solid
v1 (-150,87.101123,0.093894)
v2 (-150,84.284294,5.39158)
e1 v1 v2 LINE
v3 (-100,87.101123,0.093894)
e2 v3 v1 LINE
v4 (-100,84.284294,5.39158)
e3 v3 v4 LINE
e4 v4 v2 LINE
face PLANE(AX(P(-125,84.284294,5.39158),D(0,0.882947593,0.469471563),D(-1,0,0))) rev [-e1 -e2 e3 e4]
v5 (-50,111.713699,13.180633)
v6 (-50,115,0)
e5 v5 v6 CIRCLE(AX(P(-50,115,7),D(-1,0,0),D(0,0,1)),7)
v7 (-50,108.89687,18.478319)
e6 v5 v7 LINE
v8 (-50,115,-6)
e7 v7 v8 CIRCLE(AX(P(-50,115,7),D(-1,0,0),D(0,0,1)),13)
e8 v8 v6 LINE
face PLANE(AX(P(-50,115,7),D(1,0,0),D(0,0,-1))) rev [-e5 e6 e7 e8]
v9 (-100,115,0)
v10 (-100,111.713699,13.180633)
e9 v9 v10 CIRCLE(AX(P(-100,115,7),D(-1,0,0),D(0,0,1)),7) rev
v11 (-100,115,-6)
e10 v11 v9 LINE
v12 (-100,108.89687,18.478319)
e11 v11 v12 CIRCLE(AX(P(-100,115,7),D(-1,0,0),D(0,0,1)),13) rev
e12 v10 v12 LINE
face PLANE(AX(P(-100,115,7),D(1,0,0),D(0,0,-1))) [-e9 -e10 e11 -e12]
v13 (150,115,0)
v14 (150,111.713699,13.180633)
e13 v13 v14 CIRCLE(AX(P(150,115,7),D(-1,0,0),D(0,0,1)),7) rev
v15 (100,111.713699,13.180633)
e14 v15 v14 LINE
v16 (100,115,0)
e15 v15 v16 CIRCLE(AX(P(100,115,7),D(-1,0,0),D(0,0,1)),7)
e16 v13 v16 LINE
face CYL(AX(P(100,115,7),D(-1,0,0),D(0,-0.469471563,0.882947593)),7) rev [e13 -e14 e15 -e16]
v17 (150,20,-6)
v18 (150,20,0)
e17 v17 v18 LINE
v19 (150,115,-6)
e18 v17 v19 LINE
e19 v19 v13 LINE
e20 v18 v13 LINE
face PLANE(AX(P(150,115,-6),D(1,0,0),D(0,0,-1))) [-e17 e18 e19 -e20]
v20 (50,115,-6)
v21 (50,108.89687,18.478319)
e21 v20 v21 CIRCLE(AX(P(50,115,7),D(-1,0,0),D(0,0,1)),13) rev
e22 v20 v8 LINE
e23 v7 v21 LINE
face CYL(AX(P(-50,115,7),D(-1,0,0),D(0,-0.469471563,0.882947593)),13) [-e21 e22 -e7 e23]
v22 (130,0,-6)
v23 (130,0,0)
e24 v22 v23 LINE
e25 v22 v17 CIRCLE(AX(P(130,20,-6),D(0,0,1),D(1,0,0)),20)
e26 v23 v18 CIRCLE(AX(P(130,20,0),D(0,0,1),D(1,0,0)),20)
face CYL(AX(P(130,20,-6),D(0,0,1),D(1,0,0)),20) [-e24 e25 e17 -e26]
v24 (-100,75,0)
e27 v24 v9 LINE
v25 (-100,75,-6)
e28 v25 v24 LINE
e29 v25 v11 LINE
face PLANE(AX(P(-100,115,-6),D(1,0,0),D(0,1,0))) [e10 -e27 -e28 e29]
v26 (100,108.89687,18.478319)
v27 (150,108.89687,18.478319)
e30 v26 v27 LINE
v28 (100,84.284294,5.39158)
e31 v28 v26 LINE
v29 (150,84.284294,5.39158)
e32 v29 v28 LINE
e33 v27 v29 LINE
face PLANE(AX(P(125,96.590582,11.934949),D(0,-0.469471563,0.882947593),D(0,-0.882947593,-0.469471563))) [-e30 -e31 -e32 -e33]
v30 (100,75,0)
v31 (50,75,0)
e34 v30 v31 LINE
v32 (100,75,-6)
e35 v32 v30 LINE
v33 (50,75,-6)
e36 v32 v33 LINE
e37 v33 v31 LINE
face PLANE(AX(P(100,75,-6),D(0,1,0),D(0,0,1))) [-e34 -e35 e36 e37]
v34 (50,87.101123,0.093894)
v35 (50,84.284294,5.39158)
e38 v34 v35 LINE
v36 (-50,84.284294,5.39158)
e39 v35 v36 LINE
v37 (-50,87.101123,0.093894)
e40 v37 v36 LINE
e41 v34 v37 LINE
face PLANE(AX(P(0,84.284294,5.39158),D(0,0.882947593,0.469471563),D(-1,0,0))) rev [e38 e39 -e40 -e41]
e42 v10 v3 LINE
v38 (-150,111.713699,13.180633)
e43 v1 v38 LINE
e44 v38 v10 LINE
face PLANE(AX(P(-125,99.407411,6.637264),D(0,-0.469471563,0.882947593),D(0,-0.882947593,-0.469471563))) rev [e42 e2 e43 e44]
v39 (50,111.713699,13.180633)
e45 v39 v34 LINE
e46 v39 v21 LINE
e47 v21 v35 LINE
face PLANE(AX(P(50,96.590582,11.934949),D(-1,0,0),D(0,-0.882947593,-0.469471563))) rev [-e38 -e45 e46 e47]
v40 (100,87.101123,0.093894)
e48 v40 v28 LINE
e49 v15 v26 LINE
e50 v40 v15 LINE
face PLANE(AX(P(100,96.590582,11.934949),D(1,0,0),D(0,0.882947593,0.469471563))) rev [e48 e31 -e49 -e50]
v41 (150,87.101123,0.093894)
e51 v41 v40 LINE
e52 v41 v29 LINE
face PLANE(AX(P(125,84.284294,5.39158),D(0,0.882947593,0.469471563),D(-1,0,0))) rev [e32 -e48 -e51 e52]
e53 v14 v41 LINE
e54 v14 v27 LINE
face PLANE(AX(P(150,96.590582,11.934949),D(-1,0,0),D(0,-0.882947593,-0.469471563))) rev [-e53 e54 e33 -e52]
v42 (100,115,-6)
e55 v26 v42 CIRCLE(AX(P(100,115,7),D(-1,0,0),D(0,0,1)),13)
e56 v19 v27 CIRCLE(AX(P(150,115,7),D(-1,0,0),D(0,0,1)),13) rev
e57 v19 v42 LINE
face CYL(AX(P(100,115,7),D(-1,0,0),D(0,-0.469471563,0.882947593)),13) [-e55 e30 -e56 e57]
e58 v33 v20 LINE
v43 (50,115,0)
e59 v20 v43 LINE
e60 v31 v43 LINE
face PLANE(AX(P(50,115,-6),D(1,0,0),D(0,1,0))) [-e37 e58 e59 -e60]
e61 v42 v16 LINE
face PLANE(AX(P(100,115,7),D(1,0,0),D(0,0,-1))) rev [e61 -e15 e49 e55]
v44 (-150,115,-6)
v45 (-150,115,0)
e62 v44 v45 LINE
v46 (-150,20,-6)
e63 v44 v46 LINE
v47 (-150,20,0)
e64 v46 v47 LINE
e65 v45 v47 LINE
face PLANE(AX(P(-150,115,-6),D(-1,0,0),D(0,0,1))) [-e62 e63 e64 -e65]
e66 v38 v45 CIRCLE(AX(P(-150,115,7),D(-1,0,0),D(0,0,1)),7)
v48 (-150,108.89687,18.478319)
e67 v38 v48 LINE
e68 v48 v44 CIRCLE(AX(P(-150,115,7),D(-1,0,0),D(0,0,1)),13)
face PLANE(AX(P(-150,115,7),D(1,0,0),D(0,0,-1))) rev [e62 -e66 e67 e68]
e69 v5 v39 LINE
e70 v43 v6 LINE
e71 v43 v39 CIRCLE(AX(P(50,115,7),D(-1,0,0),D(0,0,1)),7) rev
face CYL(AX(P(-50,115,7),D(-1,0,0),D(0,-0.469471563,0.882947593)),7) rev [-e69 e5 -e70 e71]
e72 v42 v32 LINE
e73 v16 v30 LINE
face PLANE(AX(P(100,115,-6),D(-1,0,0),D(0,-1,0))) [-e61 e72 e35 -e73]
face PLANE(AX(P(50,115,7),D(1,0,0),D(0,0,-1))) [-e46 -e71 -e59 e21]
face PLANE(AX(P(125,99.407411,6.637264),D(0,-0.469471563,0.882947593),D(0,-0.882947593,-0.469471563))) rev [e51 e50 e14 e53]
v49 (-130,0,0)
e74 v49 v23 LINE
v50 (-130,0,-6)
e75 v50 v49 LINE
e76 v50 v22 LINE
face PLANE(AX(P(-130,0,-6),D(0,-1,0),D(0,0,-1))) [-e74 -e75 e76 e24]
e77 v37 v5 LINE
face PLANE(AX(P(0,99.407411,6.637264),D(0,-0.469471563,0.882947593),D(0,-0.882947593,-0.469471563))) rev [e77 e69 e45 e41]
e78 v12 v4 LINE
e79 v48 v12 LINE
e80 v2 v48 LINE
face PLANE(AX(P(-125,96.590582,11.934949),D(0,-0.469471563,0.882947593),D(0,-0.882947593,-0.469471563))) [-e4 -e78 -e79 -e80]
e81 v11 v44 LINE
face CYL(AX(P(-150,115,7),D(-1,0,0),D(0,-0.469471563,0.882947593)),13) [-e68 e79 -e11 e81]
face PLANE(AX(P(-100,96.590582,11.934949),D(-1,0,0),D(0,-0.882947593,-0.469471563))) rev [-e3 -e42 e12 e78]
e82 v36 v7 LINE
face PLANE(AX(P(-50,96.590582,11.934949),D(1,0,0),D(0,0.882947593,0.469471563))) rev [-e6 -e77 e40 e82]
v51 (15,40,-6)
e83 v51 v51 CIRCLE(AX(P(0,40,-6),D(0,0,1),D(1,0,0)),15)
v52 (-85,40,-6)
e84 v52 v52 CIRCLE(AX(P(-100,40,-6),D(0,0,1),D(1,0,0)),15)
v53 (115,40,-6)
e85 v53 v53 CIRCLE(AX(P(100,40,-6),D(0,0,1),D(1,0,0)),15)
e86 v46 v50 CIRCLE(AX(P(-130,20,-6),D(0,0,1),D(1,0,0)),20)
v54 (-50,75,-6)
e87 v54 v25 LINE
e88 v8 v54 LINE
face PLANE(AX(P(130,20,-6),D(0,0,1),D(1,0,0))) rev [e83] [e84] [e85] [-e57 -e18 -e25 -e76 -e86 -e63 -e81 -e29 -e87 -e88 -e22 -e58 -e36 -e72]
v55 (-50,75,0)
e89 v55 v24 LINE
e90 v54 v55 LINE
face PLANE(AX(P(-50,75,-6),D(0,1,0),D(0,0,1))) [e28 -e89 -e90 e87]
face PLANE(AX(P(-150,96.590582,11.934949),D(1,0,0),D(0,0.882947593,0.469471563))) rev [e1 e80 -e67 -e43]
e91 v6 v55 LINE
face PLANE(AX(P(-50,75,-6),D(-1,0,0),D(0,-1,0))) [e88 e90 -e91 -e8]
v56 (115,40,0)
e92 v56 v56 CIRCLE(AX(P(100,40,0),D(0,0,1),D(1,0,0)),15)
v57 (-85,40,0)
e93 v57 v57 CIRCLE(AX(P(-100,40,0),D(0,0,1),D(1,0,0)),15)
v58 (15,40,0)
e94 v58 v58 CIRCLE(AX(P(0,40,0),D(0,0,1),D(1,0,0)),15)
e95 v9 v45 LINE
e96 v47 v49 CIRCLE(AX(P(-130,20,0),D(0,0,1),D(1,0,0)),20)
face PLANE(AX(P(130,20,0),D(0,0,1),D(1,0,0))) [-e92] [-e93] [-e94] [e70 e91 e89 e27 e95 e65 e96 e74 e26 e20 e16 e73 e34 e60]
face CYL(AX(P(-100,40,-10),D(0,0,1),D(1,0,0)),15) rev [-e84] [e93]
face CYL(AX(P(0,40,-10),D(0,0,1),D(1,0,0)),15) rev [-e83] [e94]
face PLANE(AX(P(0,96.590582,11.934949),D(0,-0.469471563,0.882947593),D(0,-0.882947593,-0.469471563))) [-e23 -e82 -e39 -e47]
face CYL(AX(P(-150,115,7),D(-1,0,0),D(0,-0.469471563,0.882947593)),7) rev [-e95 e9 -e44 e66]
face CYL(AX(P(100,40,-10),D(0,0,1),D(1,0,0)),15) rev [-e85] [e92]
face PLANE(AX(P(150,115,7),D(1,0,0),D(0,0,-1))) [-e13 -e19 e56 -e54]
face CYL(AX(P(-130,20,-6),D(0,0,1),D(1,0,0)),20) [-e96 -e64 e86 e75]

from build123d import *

# Parameters (mm, degrees)
BASE_FLANGE1_DEPTH = 6
HEM1_START         = -50
HEM1_DEPTH         = 100
HEM1_START_2       = -150
HEM1_2_DEPTH       = 50
HEM1_START_3       = 100
HEM1_3_DEPTH       = 50
SKETCH14_R         = 15
CUT_EXTRUDE1_DEPTH = 10


# Read off the part's stored shape, not the designer's step: Hem1
# Sheet-metal steps are written as plain solids
with BuildPart() as part:
    # Sketch1 → Base-Flange1 (new body)
    with BuildSketch(Plane.XY):
        with BuildLine():
            Line((100, 75), (50, 75))
            Line((50, 75), (50, 115))
            Line((50, 115), (-50, 115))
            Line((-50, 115), (-50, 75))
            Line((-50, 75), (-100, 75))
            Line((-100, 75), (-100, 115))
            Line((-100, 115), (-150, 115))
            Line((-150, 115), (-150, 20))
            ThreePointArc((-150, 20), (-144.142135624, 5.857864376), (-130, 0))
            Line((-130, 0), (130, 0))
            ThreePointArc((130, 0), (144.142135624, 5.857864376), (150, 20))
            Line((150, 20), (150, 115))
            Line((150, 115), (100, 115))
            Line((100, 115), (100, 75))
        make_face()
    extrude(amount=-BASE_FLANGE1_DEPTH)

    # Hem1 outline → Hem1 (add)
    with BuildSketch(Plane.YZ.offset(HEM1_START)):
        with BuildLine():
            Line((84.284293607, 5.39157987), (87.101122984, 0.093894313))
            Line((87.101122984, 0.093894313), (111.71369906, 13.18063315))
            ThreePointArc((111.71369906, 13.18063315), (121.792070084, 8.69345327), (115, 0))
            Line((115, 0), (115, -6))
            ThreePointArc((115, -6), (127.613844442, 10.144984643), (108.896869684, 18.478318707))
            Line((108.896869684, 18.478318707), (84.284293607, 5.39157987))
        make_face()
    extrude(amount=HEM1_DEPTH)

    # Hem1 2 outline → Hem1 2 (add)
    with BuildSketch(Plane.YZ.offset(HEM1_START_2)):
        with BuildLine():
            Line((84.284293607, 5.39157987), (87.101122984, 0.093894313))
            Line((87.101122984, 0.093894313), (111.71369906, 13.18063315))
            ThreePointArc((111.71369906, 13.18063315), (121.792070084, 8.69345327), (115, 0))
            Line((115, 0), (115, -6))
            ThreePointArc((115, -6), (127.613844442, 10.144984643), (108.896869684, 18.478318707))
            Line((108.896869684, 18.478318707), (84.284293607, 5.39157987))
        make_face()
    extrude(amount=HEM1_2_DEPTH)

    # Hem1 3 outline → Hem1 3 (add)
    with BuildSketch(Plane.YZ.offset(HEM1_START_3)):
        with BuildLine():
            Line((84.284293607, 5.39157987), (87.101122984, 0.093894313))
            Line((87.101122984, 0.093894313), (111.71369906, 13.18063315))
            ThreePointArc((111.71369906, 13.18063315), (121.792070084, 8.69345327), (115, 0))
            Line((115, 0), (115, -6))
            ThreePointArc((115, -6), (127.613844442, 10.144984643), (108.896869684, 18.478318707))
            Line((108.896869684, 18.478318707), (84.284293607, 5.39157987))
        make_face()
    extrude(amount=HEM1_3_DEPTH)

    # Sketch14 → Cut-Extrude1 (cut)
    with BuildSketch(Plane.XY):
        with Locations((100, 40)):
            Circle(SKETCH14_R)
        with Locations((0, 40)):
            Circle(SKETCH14_R)
        with Locations((-100, 40)):
            Circle(SKETCH14_R)
    extrude(amount=-CUT_EXTRUDE1_DEPTH, mode=Mode.SUBTRACT)


solid = part.part
